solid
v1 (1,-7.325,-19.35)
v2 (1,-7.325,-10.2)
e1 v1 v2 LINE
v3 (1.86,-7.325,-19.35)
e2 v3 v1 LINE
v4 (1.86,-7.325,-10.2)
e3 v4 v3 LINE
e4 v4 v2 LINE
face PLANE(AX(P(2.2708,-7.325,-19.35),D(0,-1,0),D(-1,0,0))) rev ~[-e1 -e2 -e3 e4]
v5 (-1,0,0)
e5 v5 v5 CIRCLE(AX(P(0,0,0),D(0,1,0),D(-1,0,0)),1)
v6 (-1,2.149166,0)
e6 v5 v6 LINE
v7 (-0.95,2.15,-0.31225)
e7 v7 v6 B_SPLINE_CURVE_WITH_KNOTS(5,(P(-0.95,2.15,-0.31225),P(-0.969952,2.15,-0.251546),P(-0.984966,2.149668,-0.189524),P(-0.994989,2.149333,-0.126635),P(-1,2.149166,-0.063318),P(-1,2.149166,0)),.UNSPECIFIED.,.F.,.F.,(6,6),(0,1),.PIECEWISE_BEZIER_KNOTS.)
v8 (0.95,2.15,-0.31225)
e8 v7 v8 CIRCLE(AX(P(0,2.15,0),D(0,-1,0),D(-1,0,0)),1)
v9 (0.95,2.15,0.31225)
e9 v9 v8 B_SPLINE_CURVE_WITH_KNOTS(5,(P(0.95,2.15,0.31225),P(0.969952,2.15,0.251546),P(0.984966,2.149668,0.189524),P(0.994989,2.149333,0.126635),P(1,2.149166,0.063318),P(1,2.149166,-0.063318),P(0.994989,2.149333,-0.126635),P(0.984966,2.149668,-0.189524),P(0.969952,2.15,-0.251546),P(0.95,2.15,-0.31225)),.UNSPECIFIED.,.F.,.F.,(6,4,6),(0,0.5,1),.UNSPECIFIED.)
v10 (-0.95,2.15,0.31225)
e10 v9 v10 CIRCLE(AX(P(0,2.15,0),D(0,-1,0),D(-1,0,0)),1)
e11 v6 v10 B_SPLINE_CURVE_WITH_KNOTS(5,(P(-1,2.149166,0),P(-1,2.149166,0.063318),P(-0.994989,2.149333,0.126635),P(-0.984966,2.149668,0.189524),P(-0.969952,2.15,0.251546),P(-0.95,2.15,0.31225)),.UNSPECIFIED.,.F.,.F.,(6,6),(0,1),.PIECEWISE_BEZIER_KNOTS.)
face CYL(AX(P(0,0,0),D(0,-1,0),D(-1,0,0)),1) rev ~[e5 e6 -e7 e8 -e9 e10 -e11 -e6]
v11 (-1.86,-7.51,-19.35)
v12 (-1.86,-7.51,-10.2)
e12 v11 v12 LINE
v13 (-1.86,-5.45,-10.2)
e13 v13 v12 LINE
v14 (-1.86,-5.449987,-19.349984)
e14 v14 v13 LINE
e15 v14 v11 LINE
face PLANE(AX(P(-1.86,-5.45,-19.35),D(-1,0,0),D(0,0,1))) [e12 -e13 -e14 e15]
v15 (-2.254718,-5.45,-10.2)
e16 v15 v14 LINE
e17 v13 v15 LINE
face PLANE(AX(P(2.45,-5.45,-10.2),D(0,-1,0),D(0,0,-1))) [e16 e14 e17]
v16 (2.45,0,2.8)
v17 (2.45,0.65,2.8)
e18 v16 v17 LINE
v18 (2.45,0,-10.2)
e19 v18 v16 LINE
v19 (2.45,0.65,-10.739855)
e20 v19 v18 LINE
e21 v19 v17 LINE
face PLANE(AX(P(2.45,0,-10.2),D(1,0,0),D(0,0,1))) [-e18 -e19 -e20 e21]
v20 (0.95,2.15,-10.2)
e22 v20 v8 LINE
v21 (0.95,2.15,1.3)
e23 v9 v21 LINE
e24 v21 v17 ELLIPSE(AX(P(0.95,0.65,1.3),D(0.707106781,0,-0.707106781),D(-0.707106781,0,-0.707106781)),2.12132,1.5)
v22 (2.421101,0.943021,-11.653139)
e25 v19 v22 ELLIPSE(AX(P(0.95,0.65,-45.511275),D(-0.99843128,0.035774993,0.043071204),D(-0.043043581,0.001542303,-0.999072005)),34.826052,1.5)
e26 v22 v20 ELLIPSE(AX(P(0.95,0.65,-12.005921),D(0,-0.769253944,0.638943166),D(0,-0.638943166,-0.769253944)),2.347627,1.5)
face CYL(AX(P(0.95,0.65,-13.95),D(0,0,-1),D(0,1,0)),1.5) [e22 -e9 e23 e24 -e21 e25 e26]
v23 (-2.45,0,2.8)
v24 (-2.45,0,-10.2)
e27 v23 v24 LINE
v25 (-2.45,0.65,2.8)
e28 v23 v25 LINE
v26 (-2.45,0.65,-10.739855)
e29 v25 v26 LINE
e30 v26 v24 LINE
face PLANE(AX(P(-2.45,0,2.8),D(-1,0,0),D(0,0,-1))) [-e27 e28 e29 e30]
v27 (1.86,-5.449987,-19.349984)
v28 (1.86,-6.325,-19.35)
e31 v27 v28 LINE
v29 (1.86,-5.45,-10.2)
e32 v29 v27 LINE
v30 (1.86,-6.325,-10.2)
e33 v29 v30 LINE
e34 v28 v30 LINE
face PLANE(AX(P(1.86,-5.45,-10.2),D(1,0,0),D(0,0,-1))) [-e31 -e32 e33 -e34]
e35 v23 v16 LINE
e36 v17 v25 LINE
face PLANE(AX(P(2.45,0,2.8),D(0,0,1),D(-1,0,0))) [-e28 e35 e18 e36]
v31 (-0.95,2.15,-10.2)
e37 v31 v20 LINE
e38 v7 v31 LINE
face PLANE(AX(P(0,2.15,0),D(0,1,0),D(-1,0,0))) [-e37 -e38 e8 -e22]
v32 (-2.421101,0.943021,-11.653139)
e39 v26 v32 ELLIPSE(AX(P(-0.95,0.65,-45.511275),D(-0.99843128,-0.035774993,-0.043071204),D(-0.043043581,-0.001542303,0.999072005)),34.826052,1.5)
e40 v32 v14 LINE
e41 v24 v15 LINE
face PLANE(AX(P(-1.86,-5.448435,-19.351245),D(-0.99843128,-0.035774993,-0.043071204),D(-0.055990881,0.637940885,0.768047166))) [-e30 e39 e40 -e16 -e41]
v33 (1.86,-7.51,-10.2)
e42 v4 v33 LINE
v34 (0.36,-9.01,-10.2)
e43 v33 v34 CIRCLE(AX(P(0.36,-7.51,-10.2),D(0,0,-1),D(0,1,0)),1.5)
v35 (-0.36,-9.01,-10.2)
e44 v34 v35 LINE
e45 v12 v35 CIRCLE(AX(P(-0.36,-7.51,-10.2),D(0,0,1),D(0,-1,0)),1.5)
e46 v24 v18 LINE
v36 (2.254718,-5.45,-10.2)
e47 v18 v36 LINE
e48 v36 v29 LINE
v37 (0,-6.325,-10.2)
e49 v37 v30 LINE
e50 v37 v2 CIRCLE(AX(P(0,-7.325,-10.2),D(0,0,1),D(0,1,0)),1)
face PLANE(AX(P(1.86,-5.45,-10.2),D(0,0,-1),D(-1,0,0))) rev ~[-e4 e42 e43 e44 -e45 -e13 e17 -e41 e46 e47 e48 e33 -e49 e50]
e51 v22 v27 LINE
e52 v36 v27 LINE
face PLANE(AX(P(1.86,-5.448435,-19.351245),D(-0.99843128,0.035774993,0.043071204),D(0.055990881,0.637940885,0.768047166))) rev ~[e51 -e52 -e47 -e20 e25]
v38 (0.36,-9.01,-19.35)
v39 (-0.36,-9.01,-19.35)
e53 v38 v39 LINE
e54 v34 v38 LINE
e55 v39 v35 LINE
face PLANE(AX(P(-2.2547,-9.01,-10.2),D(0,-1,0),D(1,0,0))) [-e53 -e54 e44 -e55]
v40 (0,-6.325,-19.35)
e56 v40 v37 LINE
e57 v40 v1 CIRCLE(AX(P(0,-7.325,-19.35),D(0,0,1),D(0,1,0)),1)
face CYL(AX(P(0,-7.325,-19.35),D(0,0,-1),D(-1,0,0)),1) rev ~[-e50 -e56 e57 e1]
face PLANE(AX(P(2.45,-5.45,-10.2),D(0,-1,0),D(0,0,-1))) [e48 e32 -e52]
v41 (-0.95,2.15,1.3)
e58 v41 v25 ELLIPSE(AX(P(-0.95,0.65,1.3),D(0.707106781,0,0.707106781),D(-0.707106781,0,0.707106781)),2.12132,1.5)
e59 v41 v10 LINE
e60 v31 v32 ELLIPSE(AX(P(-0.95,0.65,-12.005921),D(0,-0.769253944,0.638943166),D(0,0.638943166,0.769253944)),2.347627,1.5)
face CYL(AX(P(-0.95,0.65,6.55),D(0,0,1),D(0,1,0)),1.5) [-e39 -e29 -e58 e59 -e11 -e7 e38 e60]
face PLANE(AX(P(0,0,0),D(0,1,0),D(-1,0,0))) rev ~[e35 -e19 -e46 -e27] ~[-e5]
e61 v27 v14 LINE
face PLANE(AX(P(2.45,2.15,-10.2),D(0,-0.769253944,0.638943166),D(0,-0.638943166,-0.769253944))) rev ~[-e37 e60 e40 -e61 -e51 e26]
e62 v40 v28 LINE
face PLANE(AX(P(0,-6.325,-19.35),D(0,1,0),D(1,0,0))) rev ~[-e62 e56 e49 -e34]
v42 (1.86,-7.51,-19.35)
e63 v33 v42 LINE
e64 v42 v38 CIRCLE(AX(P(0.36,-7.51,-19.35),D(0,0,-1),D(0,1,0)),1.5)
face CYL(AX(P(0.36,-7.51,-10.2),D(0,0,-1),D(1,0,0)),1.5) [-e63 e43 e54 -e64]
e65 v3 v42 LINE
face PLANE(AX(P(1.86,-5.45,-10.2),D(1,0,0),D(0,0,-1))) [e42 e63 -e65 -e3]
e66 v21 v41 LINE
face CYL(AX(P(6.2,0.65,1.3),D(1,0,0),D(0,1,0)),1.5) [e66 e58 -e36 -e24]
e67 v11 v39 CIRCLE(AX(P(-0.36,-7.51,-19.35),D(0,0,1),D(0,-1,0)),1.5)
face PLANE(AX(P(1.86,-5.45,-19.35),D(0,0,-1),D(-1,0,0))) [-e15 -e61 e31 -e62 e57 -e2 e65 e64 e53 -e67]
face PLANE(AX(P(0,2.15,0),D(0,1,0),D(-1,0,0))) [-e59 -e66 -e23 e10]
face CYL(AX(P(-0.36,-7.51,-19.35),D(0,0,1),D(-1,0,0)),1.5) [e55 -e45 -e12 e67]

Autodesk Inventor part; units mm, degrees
ref_plane "YZ Plane" through (0, 0, 0) normal (1, 0, 0) x (0, 1, 0)
ref_plane "XZ Plane" through (0, 0, 0) normal (0, 1, 0) x (-1, 0, 0)
ref_plane "XY Plane" through (0, 0, 0) normal (0, 0, 1) x (1, 0, 0)
sketch "Sketch1" plane through (0, 0, 0) normal (0, 1, 0) x (-1, 0, 0)
  circle A0 centre (0, 0) radius 1
  line L0 (0, 1) -> (0, 2.8)
  line L1 (-2.45, 2.8) -> (2.45, 2.8)
  line L2 (2.45, 2.8) -> (2.45, -10.2)
  line L3 (2.45, -10.2) -> (-2.45, -10.2)
  line L4 (-2.45, -10.2) -> (-2.45, 2.8)
  dimension "d0" = 2
  dimension "d1" = 1.8
  dimension "d2" = 4.9
  dimension "d3" = 13
extrude "Extrusion1" add sketch "Sketch1" along normal blind 2.15
sketch "Sketch2" plane through (2.45, 0, 2.8) normal (1, 0, 0) x (0, 0, -1)
  line L0 (0, 0) -> (13, 0) projected
  line L1 (13, 2.15) -> (13, -5.45)
  line L2 (13, -5.45) -> (22.15, -5.45)
  line L3 (13, 2.15) -> (22.15, -5.45)
  point P0 (2.8, 0)
  dimension "d6" = 7.6
  dimension "d7" = 9.15
extrude "Extrusion2" add sketch "Sketch2" against normal up to surface (4.9 mm away)
sketch "Sketch3" plane through (-2.45, 2.15, -10.2) normal (0, 0.7692539, -0.6389432) x (1, 0, 0)
  line L0 (4.31, 11.8946) -> (0.59, 11.8946)
  line L1 (4.9, 11.8946) -> (0, 11.8946) projected
  line L2 (4.9, -8.6266) -> (4.9, 1.3737) projected
  line L3 (4.31, 11.8946) -> (4.9, 1.3737)
  line L4 (0, 1.3737) -> (0, -8.6266) projected
  line L5 (0.59, 11.8946) -> (0, 1.3737)
  line L6 (4.9, 1.3737) -> (0, 1.3737) projected
  line L7 (4.9, 1.3737) -> (4.9, 11.8946)
  line L8 (4.9, 11.8946) -> (4.31, 11.8946)
  line L9 (0.59, 11.8946) -> (0, 11.8946)
  line L10 (0, 11.8946) -> (0, 1.3737)
  point P0 (2.45, -6.4727)
  point P1 (2.45, 11.8946)
  point P2 (0.59, 11.8946)
  point P3 (4.31, 11.8946)
  dimension "d10" = 3.72
extrude "Extrusion3" cut sketch "Sketch3" against normal blind 10 contours L1 L7 L3 | L5 L10 L1
sketch "Sketch4" plane through (-2.2547, -5.45, -10.2) normal (0, -1, 0) x (1, 0, 0)
  line L0 (4.1147, -9.15) -> (0.3947, -9.15) projected
  line L1 (4.7047, 0) -> (-0.1953, 0) projected
  line L2 (4.1147, -9.15) -> (0.3947, -9.15)
  line L3 (0.3947, -9.15) -> (0.3947, 0)
  line L4 (0.3947, 0) -> (4.1147, 0)
  line L5 (4.1147, 0) -> (4.1147, -9.15)
  point P0 (2.2547, 10.2)
  dimension "d13" = 3.72
extrude "Extrusion4" add sketch "Sketch4" along normal blind 3.56
fillet "Fillet1" radius 1.5 2 edges at (1.86, -9.01, -14.775) (-1.86, -9.01, -14.775)
sketch "Sketch5" plane through (1.86, -5.45, -19.35) normal (0, 0, -1) x (-1, 0, 0)
  circle A0 centre (1.86, -1.875) radius 1
  line L0 (1.86, -0.875) -> (-0.4108, -0.875)
  line L1 (-0.4108, -0.875) -> (-0.4108, -1.875)
  line L2 (-0.4108, -1.875) -> (0.86, -1.875)
  point P0 (1.86, 5.45)
  dimension "d17" = 2
extrude "Extrusion5" cut sketch "Sketch5" against normal through all contours A0
sketch "Sketch6" plane through (1.86, -5.45, -19.35) normal (0, 0, -1) x (-1, 0, 0)
  point P0 (1.86, 5.45)
extrude "Extrusion6" cut sketch "Sketch5" against normal through all contours A0 L2 L1 L0
fillet "Fillet2" radius 1.5 3 edges at (2.45, 2.15, -3.7) (-2.45, 2.15, -3.7) (0, 2.15, 2.8)
